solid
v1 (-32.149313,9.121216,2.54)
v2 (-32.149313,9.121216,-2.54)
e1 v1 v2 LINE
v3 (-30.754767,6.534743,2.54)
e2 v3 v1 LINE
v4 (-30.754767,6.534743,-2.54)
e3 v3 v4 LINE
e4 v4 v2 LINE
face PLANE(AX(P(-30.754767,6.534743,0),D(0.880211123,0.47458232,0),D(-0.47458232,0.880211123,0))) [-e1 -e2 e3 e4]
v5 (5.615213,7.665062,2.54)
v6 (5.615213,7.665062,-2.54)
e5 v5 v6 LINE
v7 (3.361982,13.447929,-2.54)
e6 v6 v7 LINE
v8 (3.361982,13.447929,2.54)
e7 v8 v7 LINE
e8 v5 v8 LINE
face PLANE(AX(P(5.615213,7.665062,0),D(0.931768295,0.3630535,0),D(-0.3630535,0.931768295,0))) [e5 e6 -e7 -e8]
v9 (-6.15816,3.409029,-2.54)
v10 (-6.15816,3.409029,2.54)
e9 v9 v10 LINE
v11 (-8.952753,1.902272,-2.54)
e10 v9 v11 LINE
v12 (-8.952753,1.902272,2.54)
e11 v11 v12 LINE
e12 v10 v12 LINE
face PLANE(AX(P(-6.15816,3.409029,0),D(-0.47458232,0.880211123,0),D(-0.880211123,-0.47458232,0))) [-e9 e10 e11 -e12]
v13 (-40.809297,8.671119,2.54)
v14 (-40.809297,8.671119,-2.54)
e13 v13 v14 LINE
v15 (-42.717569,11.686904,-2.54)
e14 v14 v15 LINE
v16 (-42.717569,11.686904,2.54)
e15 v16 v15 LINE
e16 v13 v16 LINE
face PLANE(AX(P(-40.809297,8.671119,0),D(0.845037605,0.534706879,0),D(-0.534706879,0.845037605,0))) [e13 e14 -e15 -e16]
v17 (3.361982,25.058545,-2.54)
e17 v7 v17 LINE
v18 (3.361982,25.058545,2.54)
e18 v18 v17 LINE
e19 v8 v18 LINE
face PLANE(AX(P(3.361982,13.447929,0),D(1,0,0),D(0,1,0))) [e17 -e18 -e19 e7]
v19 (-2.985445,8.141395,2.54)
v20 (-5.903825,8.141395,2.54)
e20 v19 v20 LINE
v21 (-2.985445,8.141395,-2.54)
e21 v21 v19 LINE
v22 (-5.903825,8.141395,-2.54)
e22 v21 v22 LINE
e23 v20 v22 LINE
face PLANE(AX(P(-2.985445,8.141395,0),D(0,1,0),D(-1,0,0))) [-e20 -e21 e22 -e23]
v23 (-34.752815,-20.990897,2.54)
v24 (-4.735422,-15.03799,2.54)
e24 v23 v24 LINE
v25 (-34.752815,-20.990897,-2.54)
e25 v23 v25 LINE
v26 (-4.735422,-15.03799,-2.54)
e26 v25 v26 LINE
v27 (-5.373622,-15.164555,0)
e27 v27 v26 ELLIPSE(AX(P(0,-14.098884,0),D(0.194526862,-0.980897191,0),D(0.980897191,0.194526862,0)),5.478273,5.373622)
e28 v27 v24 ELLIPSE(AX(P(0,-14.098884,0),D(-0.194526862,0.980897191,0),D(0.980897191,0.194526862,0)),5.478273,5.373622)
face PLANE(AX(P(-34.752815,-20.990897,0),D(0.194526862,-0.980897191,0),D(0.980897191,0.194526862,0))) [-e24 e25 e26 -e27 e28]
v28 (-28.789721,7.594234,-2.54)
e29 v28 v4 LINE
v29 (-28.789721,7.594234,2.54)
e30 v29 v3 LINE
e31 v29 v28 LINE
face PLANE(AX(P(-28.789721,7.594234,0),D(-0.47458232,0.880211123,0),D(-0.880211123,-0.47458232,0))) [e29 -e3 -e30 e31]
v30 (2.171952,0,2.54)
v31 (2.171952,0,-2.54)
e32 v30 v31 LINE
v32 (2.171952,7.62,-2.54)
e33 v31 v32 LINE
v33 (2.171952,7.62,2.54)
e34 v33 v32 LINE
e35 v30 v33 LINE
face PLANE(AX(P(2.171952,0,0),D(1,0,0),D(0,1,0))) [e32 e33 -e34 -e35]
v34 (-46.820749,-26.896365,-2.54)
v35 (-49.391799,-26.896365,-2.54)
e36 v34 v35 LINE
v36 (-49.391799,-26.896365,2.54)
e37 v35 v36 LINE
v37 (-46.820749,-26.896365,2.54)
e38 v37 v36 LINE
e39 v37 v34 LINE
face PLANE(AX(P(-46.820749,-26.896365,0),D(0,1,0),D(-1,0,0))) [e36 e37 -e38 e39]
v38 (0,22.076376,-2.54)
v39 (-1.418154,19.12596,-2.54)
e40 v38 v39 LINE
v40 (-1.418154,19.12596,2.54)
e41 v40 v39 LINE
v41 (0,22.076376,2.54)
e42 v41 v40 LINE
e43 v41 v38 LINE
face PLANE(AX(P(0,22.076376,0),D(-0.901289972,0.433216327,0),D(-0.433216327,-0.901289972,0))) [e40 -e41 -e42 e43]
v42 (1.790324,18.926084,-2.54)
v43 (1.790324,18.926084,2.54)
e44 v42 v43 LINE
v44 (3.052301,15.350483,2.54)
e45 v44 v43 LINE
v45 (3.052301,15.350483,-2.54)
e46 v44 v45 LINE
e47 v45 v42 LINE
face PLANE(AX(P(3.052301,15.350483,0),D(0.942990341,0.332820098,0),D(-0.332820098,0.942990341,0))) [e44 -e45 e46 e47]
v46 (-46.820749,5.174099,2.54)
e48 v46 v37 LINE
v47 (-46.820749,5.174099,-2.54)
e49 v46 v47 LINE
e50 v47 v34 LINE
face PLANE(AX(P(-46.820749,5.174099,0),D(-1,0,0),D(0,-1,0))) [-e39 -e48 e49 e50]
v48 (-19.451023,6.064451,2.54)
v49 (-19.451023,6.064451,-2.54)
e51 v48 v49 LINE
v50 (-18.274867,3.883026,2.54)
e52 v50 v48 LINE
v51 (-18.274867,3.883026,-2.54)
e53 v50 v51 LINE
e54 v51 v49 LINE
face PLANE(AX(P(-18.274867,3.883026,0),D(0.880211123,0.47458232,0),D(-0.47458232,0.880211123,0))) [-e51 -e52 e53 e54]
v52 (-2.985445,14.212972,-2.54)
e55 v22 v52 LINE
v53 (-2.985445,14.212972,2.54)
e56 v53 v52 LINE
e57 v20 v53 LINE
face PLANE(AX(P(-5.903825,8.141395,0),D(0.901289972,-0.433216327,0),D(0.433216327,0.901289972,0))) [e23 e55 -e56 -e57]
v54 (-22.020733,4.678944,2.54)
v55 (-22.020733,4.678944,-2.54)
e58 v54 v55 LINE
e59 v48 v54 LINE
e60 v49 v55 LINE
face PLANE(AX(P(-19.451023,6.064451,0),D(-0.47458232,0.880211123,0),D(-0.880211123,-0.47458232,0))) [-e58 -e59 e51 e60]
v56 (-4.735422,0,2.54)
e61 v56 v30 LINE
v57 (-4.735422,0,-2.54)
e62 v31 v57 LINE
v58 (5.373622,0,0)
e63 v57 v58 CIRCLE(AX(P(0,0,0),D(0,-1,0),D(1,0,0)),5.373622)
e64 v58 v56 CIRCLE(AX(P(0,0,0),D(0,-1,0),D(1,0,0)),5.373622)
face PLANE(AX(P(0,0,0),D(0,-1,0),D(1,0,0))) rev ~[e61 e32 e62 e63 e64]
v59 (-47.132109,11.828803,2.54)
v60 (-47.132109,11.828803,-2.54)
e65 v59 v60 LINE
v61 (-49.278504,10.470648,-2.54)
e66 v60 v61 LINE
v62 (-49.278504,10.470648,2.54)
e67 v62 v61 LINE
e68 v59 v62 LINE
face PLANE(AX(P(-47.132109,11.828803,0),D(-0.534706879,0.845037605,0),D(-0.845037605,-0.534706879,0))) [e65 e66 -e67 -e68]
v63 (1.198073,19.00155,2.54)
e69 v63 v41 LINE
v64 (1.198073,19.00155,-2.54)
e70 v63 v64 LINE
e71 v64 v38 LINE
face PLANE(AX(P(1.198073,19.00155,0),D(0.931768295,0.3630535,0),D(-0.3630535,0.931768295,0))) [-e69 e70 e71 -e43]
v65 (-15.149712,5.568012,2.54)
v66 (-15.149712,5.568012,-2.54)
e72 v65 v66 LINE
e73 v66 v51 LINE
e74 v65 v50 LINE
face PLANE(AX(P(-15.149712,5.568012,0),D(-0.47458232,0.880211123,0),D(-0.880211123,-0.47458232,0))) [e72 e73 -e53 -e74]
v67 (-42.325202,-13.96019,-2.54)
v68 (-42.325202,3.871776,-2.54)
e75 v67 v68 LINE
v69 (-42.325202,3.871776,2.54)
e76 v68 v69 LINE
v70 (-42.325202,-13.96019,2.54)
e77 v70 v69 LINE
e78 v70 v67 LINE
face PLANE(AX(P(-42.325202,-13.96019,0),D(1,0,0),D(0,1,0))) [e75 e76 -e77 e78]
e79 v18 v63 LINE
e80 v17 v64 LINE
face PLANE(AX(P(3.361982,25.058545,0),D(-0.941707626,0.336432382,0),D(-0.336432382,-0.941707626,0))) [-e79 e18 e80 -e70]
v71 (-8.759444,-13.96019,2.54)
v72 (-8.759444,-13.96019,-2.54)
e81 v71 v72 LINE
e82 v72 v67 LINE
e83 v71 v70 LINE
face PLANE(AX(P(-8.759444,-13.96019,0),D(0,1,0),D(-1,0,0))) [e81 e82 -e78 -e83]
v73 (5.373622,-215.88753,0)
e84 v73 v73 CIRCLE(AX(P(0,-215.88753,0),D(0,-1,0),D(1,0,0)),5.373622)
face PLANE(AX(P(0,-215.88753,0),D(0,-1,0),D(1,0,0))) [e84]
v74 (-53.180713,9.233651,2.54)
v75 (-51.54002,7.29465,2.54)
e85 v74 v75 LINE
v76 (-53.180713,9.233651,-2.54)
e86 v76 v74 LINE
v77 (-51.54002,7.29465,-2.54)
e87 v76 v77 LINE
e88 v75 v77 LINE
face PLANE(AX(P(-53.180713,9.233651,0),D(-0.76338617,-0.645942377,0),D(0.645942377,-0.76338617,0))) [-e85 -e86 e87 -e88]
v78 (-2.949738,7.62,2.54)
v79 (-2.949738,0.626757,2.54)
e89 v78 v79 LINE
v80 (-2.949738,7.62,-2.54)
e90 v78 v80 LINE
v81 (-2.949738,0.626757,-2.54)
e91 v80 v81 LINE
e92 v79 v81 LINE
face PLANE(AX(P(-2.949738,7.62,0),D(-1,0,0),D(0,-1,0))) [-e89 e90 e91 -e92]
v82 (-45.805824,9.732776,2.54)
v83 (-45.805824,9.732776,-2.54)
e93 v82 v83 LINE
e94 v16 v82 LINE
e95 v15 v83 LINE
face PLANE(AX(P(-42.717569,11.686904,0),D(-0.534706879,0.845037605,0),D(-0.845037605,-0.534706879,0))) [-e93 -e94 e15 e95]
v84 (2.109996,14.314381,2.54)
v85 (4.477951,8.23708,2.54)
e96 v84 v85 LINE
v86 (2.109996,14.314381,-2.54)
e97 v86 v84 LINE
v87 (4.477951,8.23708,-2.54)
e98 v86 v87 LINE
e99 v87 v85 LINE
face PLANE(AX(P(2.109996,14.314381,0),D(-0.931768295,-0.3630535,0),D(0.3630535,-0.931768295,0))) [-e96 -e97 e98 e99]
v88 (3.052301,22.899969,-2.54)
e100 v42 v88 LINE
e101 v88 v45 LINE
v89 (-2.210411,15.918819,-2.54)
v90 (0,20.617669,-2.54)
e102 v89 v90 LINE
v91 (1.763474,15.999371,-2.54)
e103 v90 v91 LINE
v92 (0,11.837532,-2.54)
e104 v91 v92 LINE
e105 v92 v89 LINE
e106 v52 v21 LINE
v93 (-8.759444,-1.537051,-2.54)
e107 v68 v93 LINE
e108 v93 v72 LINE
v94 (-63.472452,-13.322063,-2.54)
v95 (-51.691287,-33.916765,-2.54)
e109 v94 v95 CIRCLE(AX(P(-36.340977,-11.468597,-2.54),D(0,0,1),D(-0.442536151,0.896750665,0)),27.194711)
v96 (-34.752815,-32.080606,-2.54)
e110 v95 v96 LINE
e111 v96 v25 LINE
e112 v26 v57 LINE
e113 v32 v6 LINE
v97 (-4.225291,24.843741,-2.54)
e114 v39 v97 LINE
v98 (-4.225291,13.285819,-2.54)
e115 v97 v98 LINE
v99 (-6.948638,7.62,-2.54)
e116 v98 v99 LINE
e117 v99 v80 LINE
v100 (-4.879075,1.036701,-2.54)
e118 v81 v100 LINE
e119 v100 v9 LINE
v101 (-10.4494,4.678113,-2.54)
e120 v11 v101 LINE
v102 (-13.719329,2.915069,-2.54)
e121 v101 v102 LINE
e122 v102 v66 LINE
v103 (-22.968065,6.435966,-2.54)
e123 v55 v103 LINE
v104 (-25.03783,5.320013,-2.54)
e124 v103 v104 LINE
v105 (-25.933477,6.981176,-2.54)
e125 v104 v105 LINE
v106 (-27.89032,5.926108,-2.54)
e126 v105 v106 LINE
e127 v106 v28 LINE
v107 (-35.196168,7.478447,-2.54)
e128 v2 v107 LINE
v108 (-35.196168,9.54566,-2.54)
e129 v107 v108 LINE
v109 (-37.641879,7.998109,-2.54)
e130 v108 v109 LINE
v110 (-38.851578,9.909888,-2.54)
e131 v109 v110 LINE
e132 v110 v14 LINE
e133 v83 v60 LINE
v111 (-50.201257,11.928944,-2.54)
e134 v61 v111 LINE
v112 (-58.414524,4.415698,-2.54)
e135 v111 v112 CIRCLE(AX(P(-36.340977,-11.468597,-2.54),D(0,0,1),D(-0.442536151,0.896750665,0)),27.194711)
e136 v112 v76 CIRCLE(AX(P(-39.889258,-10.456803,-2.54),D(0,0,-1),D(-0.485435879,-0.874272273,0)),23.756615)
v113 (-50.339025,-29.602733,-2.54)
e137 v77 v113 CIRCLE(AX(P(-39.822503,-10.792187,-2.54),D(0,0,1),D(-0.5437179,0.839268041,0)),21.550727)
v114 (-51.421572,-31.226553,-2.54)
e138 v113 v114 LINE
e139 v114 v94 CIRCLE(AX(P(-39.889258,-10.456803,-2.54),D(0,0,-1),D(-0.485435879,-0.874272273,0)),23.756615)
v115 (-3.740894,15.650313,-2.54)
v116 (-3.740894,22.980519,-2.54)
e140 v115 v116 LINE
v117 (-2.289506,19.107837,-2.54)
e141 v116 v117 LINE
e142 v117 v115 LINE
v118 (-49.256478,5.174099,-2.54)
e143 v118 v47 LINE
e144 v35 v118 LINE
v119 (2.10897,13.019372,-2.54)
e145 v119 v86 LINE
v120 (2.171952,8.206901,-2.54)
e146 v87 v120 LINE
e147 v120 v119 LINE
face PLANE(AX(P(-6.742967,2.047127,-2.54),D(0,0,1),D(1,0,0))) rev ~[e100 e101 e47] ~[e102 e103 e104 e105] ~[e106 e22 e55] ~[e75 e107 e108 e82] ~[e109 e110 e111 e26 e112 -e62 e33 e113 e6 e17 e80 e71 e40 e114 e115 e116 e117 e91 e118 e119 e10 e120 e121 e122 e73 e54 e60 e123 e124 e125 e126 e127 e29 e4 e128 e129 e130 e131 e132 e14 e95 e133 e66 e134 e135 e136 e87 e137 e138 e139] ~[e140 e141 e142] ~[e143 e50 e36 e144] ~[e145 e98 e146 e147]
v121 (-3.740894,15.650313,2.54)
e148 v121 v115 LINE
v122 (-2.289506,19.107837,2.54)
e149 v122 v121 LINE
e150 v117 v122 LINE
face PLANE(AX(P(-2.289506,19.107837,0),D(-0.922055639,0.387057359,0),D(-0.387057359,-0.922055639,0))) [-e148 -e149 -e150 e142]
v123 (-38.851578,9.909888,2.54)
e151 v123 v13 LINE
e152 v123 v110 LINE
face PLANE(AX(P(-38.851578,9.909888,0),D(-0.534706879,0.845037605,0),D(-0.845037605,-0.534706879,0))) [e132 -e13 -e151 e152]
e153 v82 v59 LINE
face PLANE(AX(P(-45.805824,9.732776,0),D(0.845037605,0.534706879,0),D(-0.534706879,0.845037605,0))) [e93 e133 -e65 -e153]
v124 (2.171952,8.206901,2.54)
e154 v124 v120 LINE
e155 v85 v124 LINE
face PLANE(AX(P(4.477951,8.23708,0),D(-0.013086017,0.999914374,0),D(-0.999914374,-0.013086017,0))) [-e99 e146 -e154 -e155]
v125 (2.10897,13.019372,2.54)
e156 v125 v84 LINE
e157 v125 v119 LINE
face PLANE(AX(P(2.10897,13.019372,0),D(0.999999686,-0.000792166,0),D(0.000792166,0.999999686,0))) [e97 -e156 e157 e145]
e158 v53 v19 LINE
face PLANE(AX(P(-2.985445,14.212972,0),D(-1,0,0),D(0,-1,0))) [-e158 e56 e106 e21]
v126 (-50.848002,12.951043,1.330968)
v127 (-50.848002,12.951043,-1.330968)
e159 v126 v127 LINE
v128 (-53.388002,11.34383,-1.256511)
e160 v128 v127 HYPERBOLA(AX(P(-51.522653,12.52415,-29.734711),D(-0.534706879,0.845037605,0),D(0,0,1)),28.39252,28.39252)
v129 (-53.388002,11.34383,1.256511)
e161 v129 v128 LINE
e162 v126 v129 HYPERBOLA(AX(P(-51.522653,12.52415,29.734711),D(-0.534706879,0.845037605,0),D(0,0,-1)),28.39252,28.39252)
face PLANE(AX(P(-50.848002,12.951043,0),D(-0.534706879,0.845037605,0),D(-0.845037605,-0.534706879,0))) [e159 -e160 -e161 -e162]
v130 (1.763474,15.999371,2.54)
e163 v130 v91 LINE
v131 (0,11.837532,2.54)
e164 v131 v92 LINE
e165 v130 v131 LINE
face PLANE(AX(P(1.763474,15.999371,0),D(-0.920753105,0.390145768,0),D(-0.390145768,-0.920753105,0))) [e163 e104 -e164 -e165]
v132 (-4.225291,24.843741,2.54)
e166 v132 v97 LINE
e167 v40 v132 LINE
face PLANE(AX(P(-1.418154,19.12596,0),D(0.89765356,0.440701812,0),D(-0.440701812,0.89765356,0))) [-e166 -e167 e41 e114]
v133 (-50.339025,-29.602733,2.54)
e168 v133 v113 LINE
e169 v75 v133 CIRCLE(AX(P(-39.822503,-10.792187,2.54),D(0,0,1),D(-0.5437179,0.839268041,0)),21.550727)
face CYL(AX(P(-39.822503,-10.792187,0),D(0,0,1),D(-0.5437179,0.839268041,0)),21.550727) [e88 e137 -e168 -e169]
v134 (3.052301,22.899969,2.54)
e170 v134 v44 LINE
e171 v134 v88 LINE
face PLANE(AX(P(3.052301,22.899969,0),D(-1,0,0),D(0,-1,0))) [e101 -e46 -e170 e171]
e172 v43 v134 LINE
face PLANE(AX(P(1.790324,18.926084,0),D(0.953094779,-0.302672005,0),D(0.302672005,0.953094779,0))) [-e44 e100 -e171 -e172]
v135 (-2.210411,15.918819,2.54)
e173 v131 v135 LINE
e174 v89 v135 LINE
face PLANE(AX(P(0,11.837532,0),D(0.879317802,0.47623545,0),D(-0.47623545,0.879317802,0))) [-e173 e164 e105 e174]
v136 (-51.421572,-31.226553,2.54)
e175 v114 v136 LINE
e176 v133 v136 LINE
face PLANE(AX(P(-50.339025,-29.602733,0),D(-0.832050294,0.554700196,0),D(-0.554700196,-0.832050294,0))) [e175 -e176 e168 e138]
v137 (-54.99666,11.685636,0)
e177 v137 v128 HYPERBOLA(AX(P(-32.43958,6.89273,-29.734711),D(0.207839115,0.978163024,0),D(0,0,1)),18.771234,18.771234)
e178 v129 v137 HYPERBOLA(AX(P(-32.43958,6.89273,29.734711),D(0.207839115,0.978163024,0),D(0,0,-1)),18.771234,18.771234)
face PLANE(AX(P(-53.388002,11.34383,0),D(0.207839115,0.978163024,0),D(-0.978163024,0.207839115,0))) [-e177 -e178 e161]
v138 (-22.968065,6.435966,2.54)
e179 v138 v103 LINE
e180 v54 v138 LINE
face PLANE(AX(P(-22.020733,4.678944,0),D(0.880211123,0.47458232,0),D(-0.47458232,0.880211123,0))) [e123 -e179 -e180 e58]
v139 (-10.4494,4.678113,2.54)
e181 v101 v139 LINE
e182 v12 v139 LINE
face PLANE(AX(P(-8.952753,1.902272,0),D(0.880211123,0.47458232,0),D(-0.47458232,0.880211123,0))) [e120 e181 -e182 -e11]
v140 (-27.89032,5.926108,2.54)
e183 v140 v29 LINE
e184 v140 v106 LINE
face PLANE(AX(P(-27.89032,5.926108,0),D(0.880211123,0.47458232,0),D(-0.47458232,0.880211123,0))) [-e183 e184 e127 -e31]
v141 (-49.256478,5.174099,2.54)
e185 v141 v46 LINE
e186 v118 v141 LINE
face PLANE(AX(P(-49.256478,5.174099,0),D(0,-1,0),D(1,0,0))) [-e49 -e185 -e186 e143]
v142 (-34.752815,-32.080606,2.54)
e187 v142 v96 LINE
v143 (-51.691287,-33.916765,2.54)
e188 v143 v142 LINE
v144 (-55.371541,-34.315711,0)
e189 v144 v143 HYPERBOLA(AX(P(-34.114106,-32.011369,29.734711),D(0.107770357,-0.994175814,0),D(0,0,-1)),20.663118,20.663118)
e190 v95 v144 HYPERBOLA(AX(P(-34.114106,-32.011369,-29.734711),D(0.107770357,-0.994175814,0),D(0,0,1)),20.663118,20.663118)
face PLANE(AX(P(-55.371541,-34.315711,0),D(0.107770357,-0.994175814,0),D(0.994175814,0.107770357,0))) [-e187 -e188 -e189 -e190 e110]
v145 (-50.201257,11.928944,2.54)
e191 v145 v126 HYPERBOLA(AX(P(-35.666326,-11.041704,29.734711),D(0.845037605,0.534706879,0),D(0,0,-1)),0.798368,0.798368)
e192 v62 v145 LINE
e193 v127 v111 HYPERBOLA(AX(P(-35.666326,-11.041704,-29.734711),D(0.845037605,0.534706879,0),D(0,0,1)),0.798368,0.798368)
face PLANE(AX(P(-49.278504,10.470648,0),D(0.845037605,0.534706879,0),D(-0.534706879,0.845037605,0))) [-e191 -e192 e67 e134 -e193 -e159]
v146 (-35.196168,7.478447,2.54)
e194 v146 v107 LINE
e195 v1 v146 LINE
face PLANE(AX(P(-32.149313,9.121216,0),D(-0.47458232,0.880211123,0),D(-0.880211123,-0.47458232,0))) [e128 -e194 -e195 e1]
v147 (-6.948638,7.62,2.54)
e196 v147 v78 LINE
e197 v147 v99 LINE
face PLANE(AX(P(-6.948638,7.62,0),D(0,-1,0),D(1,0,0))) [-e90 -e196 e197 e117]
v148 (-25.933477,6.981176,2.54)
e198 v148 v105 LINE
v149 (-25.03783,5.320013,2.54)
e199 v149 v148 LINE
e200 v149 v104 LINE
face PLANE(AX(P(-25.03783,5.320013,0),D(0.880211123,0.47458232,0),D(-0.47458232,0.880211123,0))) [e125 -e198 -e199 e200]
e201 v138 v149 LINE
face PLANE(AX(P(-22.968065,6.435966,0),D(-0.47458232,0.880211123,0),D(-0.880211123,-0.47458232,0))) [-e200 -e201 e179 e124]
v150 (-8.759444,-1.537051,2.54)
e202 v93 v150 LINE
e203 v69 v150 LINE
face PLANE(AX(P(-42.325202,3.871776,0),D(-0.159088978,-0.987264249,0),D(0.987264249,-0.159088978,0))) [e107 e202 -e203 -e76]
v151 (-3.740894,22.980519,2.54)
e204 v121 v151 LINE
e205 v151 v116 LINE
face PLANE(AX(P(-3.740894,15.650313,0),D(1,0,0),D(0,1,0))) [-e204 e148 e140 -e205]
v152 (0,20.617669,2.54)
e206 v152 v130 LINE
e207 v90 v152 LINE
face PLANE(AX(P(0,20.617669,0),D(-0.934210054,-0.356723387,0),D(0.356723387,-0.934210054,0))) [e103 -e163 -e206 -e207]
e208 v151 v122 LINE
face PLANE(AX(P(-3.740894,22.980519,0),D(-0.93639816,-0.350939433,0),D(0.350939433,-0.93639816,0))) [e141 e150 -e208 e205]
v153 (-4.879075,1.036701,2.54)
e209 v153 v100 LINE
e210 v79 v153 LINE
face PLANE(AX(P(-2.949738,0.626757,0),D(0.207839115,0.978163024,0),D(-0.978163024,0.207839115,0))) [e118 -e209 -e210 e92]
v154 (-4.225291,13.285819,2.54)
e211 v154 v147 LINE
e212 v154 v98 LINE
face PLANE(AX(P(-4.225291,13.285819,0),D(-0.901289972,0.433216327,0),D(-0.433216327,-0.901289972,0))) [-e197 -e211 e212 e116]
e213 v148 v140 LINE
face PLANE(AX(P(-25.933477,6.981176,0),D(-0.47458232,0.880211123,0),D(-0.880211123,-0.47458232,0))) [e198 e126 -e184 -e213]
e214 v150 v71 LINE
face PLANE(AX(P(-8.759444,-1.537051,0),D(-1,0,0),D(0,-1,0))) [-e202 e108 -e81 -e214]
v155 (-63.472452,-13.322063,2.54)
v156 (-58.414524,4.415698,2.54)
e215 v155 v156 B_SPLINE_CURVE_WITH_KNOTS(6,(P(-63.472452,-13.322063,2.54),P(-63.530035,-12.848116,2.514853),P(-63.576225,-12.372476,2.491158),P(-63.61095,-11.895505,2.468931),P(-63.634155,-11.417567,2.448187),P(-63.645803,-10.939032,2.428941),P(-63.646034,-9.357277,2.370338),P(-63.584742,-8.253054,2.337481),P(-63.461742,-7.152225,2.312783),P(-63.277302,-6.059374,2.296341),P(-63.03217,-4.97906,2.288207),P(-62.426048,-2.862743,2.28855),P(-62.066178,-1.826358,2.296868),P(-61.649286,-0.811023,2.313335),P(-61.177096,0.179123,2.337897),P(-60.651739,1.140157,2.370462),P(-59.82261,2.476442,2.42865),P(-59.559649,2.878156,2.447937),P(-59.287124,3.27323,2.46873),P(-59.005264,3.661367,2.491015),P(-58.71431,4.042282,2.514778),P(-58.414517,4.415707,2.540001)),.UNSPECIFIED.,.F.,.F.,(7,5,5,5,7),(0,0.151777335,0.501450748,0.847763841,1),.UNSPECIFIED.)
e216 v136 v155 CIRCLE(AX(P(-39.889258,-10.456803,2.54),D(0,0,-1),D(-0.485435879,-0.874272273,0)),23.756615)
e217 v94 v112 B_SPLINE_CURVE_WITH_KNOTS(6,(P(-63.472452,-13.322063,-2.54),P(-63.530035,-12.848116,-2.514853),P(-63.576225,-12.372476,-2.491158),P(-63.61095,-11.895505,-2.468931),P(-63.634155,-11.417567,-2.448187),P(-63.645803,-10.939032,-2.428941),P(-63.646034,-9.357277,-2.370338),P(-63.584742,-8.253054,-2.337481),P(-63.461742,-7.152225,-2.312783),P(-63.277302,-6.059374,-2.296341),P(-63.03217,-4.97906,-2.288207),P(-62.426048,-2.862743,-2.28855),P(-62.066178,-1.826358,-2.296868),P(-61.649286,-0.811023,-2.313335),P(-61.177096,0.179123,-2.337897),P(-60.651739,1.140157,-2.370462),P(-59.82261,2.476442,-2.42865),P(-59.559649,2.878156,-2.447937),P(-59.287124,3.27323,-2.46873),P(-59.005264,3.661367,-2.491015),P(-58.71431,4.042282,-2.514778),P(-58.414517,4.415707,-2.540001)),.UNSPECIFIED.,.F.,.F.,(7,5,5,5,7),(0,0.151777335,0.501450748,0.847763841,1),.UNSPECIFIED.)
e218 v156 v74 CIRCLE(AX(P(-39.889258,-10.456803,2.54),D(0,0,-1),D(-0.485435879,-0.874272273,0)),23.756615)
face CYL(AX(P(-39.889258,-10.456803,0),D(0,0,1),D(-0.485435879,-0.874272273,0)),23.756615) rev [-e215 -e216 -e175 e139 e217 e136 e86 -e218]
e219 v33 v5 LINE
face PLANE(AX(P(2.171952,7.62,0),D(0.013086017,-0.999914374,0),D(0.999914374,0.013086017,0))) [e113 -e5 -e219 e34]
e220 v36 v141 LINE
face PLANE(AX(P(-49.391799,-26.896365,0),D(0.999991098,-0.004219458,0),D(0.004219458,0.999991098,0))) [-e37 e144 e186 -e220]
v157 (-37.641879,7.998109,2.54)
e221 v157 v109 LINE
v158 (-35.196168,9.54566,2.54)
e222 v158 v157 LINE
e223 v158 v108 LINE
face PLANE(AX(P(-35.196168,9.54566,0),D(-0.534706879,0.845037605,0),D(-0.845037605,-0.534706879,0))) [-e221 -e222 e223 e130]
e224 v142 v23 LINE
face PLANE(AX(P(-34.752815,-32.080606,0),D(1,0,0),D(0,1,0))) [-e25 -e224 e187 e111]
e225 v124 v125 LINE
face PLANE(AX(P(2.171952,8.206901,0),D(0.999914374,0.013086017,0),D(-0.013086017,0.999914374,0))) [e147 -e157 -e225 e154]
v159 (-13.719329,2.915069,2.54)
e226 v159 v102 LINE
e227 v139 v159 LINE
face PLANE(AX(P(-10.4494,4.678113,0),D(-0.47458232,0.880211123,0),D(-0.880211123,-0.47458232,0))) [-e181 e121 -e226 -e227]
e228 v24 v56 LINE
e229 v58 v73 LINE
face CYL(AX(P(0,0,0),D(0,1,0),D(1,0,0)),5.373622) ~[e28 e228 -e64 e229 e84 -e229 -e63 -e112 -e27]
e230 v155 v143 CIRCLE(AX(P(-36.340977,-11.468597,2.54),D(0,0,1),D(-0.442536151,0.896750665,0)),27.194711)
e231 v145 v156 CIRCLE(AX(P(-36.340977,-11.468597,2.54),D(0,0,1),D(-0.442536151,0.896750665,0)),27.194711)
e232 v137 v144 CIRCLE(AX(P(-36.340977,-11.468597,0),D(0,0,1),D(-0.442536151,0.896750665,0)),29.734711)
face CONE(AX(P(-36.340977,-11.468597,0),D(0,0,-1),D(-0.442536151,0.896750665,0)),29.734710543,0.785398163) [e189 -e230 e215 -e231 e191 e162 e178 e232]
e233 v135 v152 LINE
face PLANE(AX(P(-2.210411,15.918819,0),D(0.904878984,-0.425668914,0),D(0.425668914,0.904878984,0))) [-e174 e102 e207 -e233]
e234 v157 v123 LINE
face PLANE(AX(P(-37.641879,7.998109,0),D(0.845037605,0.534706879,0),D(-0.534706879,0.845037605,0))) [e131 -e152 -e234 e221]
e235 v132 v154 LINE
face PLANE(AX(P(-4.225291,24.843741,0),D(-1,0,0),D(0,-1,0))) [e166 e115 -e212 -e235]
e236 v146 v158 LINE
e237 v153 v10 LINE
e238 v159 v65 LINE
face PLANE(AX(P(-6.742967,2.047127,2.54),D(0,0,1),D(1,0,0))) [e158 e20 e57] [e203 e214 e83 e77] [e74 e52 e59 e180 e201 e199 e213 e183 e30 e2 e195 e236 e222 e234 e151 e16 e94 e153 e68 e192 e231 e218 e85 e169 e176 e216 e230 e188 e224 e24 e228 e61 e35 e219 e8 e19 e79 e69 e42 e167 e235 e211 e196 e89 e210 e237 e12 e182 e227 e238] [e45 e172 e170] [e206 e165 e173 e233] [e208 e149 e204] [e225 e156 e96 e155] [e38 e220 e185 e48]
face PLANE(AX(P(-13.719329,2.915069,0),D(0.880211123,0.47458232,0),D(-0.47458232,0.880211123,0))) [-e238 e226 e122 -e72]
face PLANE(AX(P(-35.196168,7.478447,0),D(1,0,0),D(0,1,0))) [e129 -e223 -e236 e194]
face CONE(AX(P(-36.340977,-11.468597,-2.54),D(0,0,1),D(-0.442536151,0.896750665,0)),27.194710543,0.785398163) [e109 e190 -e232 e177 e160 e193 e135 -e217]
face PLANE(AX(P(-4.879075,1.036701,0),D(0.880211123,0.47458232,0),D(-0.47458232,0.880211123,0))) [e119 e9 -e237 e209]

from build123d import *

# Parameters (mm, degrees)
F0_R          = 5.373622476
F1_DEPTH      = 215.88753
F3_DEPTH      = 2.54
F3_DEPTH_BACK = 2.54
F4_T2_ANGLE   = 126.5345537541
F4_T4_ANGLE   = 126.5345537541


# Not quite as in the source:
# - a fillet or chamfer that OpenCascade refuses, or shapes differently, is made with other operations: its cross-section is extruded or revolved along the edge and cut away or added


with BuildPart() as f1:
    # F0 (on Front) → F1 (new body)
    with BuildSketch(Plane.XZ):
        Circle(F0_R)
    extrude(amount=F1_DEPTH)

    # F2 (on Top) → F3 (join, two sides)
    with BuildSketch(Plane.XY) as f3_sk:
        Polygon((-8.9527533501, 1.9022722074), (-4.8790749139, 1.0367010286), (-6.158160232, 3.4090294491), align=None)
        Polygon((-13.7193289536, 2.9150694934), (-8.9527533501, 1.9022722074), (-10.4493999233, 4.6781129985), align=None)
        Polygon((-18.2748671635, 3.8830257621), (-13.7193289536, 2.9150694934), (-15.1497123605, 5.5680115299), align=None)
        Polygon((-22.0207331241, 4.6789436692), (-18.2748671635, 3.8830257621), (-19.4510233645, 6.0644508345), align=None)
        Polygon((-25.0378297706, 5.3200133908), (-22.0207331241, 4.6789436692), (-22.9680646536, 6.4359660347), align=None)
        Polygon((-27.890320124, 5.9261077295), (-25.0378297706, 5.3200133908), (-25.9334769328, 6.9811764013), align=None)
        Polygon((-28.7897214748, 7.5942336596), (-30.7547669567, 6.5347425691), (-27.890320124, 5.9261077295), align=None)
        Polygon((-32.1493126453, 9.1212161407), (-35.1961678702, 7.4784470575), (-30.7547669567, 6.5347425691), align=None)
        Polygon((-35.1961678702, 9.5456602661), (-37.6418792182, 7.9981093941), (-35.1961678702, 7.4784470575), align=None)
        Polygon((-38.8515780683, 9.9098877134), (-40.8092972733, 8.6711192604), (-37.6418792182, 7.9981093941), align=None)
        Polygon((-42.7175686579, 11.6869044373), (-45.8058244977, 9.7327764402), (-40.8092972733, 8.6711192604), align=None)
        Polygon((-47.1321087681, 11.8288034913), (-49.2785042842, 10.4706480183), (-45.8058244977, 9.7327764402), align=None)
        Polygon((-50.8480016213, 12.9510430201), (-53.3880016213, 11.343829962), (-49.2785042842, 10.4706480183), align=None)
        Polygon((-2.9497377109, 0), (0, 0), (-2.9497377109, 0.6267573614), align=None)
        Polygon((1.198072837, 19.0015498009), (3.3619815949, 13.447928708), (3.3619815949, 25.0585451722), align=None)
        Polygon((3.0523012392, 22.8999685496), (3.0523012392, 15.3504825952), (1.7903243424, 18.9260840416), align=None, mode=Mode.SUBTRACT)
        Polygon((-4.2252911557, 24.8437412083), (-4.2252911557, 13.2858192763), (-1.4181542095, 19.1259601465), align=None)
        Polygon((-3.7408936769, 22.9805186391), (-2.2895061411, 19.10783723), (-3.7408936769, 15.6503133476), align=None, mode=Mode.SUBTRACT)
        Polygon((-2.9497377109, 0.6267573614), (0, 0), (2.1719516162, 0), (2.1719516162, 7.62), (5.6152132711, 7.6650624399), (3.3619815949, 13.447928708), (1.198072837, 19.0015498009), (0, 22.0763756473), (-1.4181542095, 19.1259601465), (-4.2252911557, 13.2858192763), (-6.9486382417, 7.62), (-2.9497377109, 7.62), align=None)
        Polygon((-2.9854448512, 13.0213079974), (-2.9854448512, 8.1413947046), (-5.9038246982, 8.1413947046), (-2.9854448512, 14.2129721679), align=None, mode=Mode.SUBTRACT)
        Polygon((2.1099960018, 14.3143812405), (4.47795121, 8.2370797172), (2.1719516162, 8.2069007827), (2.1089701391, 13.0193722181), align=None, mode=Mode.SUBTRACT)
        Polygon((-2.2104110103, 15.9188192338), (0, 20.6176694483), (1.7634738469, 15.9993711859), (0, 11.8375318125), align=None, mode=Mode.SUBTRACT)
        with BuildLine():
            Line((-34.7528146772, -32.0806060351), (-34.7528146772, -20.9908965406))
            Line((-34.7528146772, -20.9908965406), (0, -14.0988837661))
            Line((0, -14.0988837661), (0, 0))
            Line((0, 0), (-2.9497377109, 0))
            Line((-2.9497377109, 0), (-2.9497377109, 0.6267573614))
            Line((-2.9497377109, 0.6267573614), (-4.8790749139, 1.0367010286))
            Line((-4.8790749139, 1.0367010286), (-8.9527533501, 1.9022722074))
            Line((-8.9527533501, 1.9022722074), (-13.7193289536, 2.9150694934))
            Line((-13.7193289536, 2.9150694934), (-18.2748671635, 3.8830257621))
            Line((-18.2748671635, 3.8830257621), (-22.0207331241, 4.6789436692))
            Line((-22.0207331241, 4.6789436692), (-25.0378297706, 5.3200133908))
            Line((-25.0378297706, 5.3200133908), (-27.890320124, 5.9261077295))
            Line((-27.890320124, 5.9261077295), (-30.7547669567, 6.5347425691))
            Line((-30.7547669567, 6.5347425691), (-35.1961678702, 7.4784470575))
            Line((-35.1961678702, 7.4784470575), (-37.6418792182, 7.9981093941))
            Line((-37.6418792182, 7.9981093941), (-40.8092972733, 8.6711192604))
            Line((-40.8092972733, 8.6711192604), (-45.8058244977, 9.7327764402))
            Line((-45.8058244977, 9.7327764402), (-49.2785042842, 10.4706480183))
            Line((-49.2785042842, 10.4706480183), (-53.3880016213, 11.343829962))
            Line((-53.3880016213, 11.343829962), (-54.9966600991, 11.6856361297))
            ThreePointArc((-54.9966600991, 11.6856361297), (-66.0747003656, -11.2262862037), (-55.3715413676, -34.3157112426))
            Line((-55.3715413676, -34.3157112426), (-34.7528146772, -32.0806060351))
        make_face()
        with BuildLine():
            ThreePointArc((-51.421571523, -31.2265530229), (-63.6234506771, -11.4887260787), (-53.1807132065, 9.2336507514))
            Line((-53.1807132065, 9.2336507514), (-51.5400195681, 7.2946498786))
            ThreePointArc((-51.5400195681, 7.2946498786), (-61.3618234836, -11.493283063), (-50.339024514, -29.6027325094))
            Line((-50.339024514, -29.6027325094), (-51.421571523, -31.2265530229))
        make_face(mode=Mode.SUBTRACT)
        Polygon((-49.3917986751, -26.8963649869), (-49.256477505, 5.174099002), (-46.8207485974, 5.174099002), (-46.8207485974, -26.8963649869), align=None, mode=Mode.SUBTRACT)
        Polygon((-42.3252023757, 3.8717763964), (-8.7594440334, -1.5370512847), (-8.7594440334, -13.9601901174), (-42.3252023757, -13.9601901174), (-42.3252023757, -1.5370512847), align=None, mode=Mode.SUBTRACT)
    extrude(amount=F3_DEPTH)
    extrude(f3_sk.sketch, amount=-F3_DEPTH_BACK)

    # F4: chamfer of 2.54 on 2 edges, made by hand

    # F4_s1 → F4_t2 (revolve, cut)
    with BuildSketch(Plane(origin=(-33.7752745406, -16.6677099753, 0), x_dir=(0, 0, 1), z_dir=(0.8967506648, 0.4425361512, 0))):
        Polygon((0, -35.5324348562), (2.54, -32.9924348562), (2.54, -35.5324348562), align=None)
    revolve(axis=Axis((-36.340977144, -11.4685968428, 2.54), (0, 0, 1)), revolution_arc=F4_T2_ANGLE, mode=Mode.SUBTRACT)

    # F4_s3 → F4_t4 (revolve, cut)
    with BuildSketch(Plane(origin=(-33.7752745406, -16.6677099753, 0), x_dir=(0, 0, 1), z_dir=(0.8967506648, 0.4425361512, 0))):
        Polygon((-2.54, -32.9924348562), (0, -35.5324348562), (-2.54, -35.5324348562), align=None)
    revolve(axis=Axis((-36.340977144, -11.4685968428, -2.54), (0, 0, 1)), revolution_arc=F4_T4_ANGLE, mode=Mode.SUBTRACT)


solid = f1.part
